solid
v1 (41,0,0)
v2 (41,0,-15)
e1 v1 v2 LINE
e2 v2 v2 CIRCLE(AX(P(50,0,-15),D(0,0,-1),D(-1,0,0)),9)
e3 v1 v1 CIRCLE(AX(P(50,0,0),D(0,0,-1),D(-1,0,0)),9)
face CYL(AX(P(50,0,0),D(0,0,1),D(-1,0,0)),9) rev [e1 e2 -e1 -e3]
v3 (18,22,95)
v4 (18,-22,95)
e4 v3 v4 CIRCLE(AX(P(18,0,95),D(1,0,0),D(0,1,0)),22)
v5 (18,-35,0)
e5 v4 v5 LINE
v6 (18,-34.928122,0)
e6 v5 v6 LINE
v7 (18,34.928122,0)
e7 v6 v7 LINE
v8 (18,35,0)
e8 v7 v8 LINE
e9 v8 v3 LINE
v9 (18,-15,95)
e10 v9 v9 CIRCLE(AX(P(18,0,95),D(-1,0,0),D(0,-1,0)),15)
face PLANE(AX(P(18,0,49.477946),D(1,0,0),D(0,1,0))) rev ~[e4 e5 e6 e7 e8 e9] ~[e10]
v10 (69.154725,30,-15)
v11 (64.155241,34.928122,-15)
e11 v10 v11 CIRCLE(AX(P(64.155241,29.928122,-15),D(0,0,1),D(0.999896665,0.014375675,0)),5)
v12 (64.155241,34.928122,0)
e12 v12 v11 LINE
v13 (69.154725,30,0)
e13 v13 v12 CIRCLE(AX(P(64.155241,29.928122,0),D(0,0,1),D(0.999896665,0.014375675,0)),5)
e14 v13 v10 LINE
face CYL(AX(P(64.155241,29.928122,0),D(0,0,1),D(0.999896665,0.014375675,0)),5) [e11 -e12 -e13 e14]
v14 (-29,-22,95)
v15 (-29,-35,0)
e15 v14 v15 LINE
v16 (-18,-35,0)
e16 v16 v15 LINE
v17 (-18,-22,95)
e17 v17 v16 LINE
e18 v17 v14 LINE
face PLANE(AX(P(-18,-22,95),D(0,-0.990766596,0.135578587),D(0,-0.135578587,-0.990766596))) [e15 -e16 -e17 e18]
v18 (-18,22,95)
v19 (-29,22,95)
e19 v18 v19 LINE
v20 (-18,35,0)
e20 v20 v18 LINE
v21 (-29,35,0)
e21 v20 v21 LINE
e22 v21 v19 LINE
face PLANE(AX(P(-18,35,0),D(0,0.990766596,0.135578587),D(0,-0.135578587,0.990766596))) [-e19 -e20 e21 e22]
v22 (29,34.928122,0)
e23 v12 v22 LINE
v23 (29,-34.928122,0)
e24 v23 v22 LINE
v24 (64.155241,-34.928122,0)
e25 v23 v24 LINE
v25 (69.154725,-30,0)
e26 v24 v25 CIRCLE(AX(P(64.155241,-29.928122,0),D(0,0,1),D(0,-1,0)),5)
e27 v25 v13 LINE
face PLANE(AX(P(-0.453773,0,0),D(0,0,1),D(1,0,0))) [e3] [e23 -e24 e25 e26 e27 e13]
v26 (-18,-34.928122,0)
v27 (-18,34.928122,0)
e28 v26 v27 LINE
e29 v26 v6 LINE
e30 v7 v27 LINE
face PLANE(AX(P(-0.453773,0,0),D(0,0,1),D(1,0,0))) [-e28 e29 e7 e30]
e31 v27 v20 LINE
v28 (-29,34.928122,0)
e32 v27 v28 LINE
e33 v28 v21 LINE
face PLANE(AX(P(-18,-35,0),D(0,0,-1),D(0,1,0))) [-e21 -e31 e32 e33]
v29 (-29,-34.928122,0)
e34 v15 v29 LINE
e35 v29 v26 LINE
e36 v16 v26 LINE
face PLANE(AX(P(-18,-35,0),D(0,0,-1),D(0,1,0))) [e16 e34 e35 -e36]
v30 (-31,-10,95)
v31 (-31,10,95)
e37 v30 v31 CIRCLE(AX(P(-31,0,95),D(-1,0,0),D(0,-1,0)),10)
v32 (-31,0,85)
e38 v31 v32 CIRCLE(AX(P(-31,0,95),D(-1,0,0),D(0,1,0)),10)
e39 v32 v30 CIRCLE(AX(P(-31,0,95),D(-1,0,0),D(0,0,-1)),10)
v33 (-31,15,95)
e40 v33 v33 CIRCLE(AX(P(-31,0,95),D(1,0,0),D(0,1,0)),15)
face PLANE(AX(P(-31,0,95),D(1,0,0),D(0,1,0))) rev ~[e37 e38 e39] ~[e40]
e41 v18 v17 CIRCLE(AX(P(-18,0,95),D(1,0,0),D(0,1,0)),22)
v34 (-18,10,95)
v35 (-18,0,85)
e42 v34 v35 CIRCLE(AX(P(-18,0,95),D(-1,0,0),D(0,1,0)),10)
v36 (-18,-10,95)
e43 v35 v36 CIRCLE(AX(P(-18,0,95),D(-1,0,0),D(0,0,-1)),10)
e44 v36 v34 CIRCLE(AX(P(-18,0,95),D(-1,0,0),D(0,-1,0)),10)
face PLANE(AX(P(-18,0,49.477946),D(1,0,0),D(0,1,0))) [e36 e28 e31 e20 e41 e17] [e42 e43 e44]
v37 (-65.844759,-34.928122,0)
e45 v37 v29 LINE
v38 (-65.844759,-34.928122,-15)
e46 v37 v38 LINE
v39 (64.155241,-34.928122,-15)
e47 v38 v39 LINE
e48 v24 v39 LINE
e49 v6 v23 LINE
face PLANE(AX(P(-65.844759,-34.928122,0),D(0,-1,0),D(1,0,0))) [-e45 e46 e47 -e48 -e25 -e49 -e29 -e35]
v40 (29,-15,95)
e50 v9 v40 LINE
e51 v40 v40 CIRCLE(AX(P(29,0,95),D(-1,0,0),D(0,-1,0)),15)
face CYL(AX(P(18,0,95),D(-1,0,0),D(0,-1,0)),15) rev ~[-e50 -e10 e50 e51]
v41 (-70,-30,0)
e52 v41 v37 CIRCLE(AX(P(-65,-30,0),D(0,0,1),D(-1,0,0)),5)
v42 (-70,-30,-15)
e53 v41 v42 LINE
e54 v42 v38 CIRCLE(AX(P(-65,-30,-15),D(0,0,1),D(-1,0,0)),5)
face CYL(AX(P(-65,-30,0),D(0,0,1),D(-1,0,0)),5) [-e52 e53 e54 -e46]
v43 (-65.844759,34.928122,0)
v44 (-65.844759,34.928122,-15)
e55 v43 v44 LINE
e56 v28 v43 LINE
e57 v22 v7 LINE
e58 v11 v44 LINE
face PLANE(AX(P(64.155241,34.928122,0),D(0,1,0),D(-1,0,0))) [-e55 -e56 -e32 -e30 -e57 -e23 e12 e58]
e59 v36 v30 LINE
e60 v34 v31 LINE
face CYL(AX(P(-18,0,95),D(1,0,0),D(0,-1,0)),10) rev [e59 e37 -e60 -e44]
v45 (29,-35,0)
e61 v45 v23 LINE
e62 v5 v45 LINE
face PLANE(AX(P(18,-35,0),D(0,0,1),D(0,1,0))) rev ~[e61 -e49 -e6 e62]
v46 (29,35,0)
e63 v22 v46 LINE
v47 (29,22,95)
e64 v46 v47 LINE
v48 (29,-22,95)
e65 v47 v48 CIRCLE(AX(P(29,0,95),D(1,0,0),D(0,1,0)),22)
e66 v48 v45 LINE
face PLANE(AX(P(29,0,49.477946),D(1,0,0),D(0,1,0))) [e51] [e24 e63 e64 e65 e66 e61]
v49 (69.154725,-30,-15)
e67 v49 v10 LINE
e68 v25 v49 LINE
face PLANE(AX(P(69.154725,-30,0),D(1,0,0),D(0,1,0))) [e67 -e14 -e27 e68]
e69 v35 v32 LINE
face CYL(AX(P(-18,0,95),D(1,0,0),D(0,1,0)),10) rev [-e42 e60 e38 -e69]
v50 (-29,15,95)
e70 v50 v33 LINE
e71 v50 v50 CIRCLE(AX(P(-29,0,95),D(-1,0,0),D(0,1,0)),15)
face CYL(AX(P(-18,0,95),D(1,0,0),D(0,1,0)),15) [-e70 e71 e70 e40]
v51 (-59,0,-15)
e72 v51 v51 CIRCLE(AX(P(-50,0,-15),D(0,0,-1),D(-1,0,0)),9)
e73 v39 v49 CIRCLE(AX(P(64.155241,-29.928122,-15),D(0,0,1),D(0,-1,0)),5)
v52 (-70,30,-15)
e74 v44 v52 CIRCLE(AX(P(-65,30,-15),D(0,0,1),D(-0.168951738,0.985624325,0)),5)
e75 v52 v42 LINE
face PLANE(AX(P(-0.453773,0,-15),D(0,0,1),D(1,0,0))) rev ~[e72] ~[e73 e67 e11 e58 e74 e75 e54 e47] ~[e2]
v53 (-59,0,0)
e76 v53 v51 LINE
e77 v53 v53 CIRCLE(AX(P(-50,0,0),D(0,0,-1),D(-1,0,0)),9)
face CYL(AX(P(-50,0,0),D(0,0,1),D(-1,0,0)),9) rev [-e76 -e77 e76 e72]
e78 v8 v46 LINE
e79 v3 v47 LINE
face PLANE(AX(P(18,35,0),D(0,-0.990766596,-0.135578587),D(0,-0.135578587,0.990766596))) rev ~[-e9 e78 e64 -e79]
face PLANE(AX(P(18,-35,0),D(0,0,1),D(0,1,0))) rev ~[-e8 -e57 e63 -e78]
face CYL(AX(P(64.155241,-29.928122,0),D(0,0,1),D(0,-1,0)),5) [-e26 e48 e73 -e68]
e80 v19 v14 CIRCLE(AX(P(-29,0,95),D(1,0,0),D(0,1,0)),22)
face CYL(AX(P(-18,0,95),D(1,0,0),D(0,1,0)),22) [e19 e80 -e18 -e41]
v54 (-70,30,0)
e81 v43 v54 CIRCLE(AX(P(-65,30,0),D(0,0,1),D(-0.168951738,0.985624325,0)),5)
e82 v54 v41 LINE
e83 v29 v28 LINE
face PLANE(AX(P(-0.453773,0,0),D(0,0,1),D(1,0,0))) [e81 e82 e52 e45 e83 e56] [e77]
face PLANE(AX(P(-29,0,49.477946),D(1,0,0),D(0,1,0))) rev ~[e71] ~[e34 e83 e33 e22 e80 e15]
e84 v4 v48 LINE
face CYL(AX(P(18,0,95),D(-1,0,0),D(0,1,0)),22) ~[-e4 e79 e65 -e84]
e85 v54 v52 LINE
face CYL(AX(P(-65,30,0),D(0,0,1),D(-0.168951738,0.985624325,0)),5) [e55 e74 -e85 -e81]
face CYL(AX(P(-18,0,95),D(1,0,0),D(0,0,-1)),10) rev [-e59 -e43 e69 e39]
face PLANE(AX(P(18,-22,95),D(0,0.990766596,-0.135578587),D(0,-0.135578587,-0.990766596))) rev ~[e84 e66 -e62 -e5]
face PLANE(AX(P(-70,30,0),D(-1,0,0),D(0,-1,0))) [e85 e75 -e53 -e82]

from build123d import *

# Parameters (mm, degrees)
F5_DEPTH = 15
F6_DEPTH = 11
F7_DEPTH = 11
F8_DEPTH = 13


# Not quite as in the source:
# - a feature of the source that left no trace in its solid (it failed there, or was rolled back) is left out


with BuildPart() as f5:
    # F0 (on Top) → F5 (new body)
    with BuildSketch(Plane.XY):
        with BuildLine():
            Line((-70, 30), (-70, 0))
            Line((-70, 0), (-70, -30))
            ThreePointArc((-70, -30), (-68.8225510753, -33.2230580629), (-65.8447586893, -34.9281216256))
            Line((-65.8447586893, -34.9281216256), (64.1552413107, -34.9281216256))
            ThreePointArc((64.1552413107, -34.9281216256), (67.6652703796, -33.4889776935), (69.154724634, -30))
            Line((69.154724634, -30), (69.154724634, 0))
            Line((69.154724634, 0), (69.154724634, 30))
            ThreePointArc((69.154724634, 30), (67.6652703796, 33.4889776935), (64.1552413107, 34.9281216256))
            Line((64.1552413107, 34.9281216256), (-65.8447586893, 34.9281216256))
            ThreePointArc((-65.8447586893, 34.9281216256), (-68.8225510753, 33.2230580629), (-70, 30))
        make_face()
        with BuildLine():
            ThreePointArc((-41, 0), (-50, -9), (-59, 0))
            ThreePointArc((-59, 0), (-50, 9), (-41, 0))
        make_face(mode=Mode.SUBTRACT)
        with BuildLine():
            ThreePointArc((59, 0), (50, -9), (41, 0))
            ThreePointArc((41, 0), (50, 9), (59, 0))
        make_face(mode=Mode.SUBTRACT)
    extrude(amount=-F5_DEPTH)

    # F2 (on offset) → F6 (join)
    with BuildSketch(Plane.YZ.offset(-18)):
        with BuildLine():
            Line((-35, 0), (0, 0))
            Line((0, 0), (35, 0))
            Line((35, 0), (22, 95))
            ThreePointArc((22, 95), (0, 117), (-22, 95))
            Line((-22, 95), (-35, 0))
        make_face()
        with BuildLine():
            ThreePointArc((15, 95), (10.6066017178, 84.3933982822), (0, 80))
            ThreePointArc((0, 80), (-10.6066017178, 84.3933982822), (-15, 95))
            ThreePointArc((-15, 95), (0, 110), (15, 95))
        make_face(mode=Mode.SUBTRACT)
    extrude(amount=-F6_DEPTH)

    # F4 (on offset) → F7 (join)
    with BuildSketch(Plane.YZ.offset(18)):
        with BuildLine():
            ThreePointArc((22, 95), (0, 117), (-22, 95))
            Line((-22, 95), (-35, 0))
            Line((-35, 0), (0, 0))
            Line((0, 0), (35, 0))
            Line((35, 0), (22, 95))
        make_face()
        with BuildLine():
            ThreePointArc((15, 95), (10.6066017178, 84.3933982822), (0, 80))
            ThreePointArc((0, 80), (-10.6066017178, 84.3933982822), (-15, 95))
            ThreePointArc((-15, 95), (0, 110), (15, 95))
        make_face(mode=Mode.SUBTRACT)
    extrude(amount=F7_DEPTH)

    # F2 (on offset) → F8 (join)
    with BuildSketch(Plane.YZ.offset(-18)):
        with BuildLine():
            ThreePointArc((-15, 95), (-10.6066017178, 84.3933982822), (0, 80))
            ThreePointArc((0, 80), (10.6066017178, 84.3933982822), (15, 95))
            ThreePointArc((15, 95), (0, 110), (-15, 95))
        make_face()
        with BuildLine():
            ThreePointArc((10, 95), (7.0710678119, 87.9289321881), (0, 85))
            ThreePointArc((0, 85), (-7.0710678119, 87.9289321881), (-10, 95))
            ThreePointArc((-10, 95), (0, 105), (10, 95))
        make_face(mode=Mode.SUBTRACT)
    extrude(amount=-F8_DEPTH)


solid = f5.part
